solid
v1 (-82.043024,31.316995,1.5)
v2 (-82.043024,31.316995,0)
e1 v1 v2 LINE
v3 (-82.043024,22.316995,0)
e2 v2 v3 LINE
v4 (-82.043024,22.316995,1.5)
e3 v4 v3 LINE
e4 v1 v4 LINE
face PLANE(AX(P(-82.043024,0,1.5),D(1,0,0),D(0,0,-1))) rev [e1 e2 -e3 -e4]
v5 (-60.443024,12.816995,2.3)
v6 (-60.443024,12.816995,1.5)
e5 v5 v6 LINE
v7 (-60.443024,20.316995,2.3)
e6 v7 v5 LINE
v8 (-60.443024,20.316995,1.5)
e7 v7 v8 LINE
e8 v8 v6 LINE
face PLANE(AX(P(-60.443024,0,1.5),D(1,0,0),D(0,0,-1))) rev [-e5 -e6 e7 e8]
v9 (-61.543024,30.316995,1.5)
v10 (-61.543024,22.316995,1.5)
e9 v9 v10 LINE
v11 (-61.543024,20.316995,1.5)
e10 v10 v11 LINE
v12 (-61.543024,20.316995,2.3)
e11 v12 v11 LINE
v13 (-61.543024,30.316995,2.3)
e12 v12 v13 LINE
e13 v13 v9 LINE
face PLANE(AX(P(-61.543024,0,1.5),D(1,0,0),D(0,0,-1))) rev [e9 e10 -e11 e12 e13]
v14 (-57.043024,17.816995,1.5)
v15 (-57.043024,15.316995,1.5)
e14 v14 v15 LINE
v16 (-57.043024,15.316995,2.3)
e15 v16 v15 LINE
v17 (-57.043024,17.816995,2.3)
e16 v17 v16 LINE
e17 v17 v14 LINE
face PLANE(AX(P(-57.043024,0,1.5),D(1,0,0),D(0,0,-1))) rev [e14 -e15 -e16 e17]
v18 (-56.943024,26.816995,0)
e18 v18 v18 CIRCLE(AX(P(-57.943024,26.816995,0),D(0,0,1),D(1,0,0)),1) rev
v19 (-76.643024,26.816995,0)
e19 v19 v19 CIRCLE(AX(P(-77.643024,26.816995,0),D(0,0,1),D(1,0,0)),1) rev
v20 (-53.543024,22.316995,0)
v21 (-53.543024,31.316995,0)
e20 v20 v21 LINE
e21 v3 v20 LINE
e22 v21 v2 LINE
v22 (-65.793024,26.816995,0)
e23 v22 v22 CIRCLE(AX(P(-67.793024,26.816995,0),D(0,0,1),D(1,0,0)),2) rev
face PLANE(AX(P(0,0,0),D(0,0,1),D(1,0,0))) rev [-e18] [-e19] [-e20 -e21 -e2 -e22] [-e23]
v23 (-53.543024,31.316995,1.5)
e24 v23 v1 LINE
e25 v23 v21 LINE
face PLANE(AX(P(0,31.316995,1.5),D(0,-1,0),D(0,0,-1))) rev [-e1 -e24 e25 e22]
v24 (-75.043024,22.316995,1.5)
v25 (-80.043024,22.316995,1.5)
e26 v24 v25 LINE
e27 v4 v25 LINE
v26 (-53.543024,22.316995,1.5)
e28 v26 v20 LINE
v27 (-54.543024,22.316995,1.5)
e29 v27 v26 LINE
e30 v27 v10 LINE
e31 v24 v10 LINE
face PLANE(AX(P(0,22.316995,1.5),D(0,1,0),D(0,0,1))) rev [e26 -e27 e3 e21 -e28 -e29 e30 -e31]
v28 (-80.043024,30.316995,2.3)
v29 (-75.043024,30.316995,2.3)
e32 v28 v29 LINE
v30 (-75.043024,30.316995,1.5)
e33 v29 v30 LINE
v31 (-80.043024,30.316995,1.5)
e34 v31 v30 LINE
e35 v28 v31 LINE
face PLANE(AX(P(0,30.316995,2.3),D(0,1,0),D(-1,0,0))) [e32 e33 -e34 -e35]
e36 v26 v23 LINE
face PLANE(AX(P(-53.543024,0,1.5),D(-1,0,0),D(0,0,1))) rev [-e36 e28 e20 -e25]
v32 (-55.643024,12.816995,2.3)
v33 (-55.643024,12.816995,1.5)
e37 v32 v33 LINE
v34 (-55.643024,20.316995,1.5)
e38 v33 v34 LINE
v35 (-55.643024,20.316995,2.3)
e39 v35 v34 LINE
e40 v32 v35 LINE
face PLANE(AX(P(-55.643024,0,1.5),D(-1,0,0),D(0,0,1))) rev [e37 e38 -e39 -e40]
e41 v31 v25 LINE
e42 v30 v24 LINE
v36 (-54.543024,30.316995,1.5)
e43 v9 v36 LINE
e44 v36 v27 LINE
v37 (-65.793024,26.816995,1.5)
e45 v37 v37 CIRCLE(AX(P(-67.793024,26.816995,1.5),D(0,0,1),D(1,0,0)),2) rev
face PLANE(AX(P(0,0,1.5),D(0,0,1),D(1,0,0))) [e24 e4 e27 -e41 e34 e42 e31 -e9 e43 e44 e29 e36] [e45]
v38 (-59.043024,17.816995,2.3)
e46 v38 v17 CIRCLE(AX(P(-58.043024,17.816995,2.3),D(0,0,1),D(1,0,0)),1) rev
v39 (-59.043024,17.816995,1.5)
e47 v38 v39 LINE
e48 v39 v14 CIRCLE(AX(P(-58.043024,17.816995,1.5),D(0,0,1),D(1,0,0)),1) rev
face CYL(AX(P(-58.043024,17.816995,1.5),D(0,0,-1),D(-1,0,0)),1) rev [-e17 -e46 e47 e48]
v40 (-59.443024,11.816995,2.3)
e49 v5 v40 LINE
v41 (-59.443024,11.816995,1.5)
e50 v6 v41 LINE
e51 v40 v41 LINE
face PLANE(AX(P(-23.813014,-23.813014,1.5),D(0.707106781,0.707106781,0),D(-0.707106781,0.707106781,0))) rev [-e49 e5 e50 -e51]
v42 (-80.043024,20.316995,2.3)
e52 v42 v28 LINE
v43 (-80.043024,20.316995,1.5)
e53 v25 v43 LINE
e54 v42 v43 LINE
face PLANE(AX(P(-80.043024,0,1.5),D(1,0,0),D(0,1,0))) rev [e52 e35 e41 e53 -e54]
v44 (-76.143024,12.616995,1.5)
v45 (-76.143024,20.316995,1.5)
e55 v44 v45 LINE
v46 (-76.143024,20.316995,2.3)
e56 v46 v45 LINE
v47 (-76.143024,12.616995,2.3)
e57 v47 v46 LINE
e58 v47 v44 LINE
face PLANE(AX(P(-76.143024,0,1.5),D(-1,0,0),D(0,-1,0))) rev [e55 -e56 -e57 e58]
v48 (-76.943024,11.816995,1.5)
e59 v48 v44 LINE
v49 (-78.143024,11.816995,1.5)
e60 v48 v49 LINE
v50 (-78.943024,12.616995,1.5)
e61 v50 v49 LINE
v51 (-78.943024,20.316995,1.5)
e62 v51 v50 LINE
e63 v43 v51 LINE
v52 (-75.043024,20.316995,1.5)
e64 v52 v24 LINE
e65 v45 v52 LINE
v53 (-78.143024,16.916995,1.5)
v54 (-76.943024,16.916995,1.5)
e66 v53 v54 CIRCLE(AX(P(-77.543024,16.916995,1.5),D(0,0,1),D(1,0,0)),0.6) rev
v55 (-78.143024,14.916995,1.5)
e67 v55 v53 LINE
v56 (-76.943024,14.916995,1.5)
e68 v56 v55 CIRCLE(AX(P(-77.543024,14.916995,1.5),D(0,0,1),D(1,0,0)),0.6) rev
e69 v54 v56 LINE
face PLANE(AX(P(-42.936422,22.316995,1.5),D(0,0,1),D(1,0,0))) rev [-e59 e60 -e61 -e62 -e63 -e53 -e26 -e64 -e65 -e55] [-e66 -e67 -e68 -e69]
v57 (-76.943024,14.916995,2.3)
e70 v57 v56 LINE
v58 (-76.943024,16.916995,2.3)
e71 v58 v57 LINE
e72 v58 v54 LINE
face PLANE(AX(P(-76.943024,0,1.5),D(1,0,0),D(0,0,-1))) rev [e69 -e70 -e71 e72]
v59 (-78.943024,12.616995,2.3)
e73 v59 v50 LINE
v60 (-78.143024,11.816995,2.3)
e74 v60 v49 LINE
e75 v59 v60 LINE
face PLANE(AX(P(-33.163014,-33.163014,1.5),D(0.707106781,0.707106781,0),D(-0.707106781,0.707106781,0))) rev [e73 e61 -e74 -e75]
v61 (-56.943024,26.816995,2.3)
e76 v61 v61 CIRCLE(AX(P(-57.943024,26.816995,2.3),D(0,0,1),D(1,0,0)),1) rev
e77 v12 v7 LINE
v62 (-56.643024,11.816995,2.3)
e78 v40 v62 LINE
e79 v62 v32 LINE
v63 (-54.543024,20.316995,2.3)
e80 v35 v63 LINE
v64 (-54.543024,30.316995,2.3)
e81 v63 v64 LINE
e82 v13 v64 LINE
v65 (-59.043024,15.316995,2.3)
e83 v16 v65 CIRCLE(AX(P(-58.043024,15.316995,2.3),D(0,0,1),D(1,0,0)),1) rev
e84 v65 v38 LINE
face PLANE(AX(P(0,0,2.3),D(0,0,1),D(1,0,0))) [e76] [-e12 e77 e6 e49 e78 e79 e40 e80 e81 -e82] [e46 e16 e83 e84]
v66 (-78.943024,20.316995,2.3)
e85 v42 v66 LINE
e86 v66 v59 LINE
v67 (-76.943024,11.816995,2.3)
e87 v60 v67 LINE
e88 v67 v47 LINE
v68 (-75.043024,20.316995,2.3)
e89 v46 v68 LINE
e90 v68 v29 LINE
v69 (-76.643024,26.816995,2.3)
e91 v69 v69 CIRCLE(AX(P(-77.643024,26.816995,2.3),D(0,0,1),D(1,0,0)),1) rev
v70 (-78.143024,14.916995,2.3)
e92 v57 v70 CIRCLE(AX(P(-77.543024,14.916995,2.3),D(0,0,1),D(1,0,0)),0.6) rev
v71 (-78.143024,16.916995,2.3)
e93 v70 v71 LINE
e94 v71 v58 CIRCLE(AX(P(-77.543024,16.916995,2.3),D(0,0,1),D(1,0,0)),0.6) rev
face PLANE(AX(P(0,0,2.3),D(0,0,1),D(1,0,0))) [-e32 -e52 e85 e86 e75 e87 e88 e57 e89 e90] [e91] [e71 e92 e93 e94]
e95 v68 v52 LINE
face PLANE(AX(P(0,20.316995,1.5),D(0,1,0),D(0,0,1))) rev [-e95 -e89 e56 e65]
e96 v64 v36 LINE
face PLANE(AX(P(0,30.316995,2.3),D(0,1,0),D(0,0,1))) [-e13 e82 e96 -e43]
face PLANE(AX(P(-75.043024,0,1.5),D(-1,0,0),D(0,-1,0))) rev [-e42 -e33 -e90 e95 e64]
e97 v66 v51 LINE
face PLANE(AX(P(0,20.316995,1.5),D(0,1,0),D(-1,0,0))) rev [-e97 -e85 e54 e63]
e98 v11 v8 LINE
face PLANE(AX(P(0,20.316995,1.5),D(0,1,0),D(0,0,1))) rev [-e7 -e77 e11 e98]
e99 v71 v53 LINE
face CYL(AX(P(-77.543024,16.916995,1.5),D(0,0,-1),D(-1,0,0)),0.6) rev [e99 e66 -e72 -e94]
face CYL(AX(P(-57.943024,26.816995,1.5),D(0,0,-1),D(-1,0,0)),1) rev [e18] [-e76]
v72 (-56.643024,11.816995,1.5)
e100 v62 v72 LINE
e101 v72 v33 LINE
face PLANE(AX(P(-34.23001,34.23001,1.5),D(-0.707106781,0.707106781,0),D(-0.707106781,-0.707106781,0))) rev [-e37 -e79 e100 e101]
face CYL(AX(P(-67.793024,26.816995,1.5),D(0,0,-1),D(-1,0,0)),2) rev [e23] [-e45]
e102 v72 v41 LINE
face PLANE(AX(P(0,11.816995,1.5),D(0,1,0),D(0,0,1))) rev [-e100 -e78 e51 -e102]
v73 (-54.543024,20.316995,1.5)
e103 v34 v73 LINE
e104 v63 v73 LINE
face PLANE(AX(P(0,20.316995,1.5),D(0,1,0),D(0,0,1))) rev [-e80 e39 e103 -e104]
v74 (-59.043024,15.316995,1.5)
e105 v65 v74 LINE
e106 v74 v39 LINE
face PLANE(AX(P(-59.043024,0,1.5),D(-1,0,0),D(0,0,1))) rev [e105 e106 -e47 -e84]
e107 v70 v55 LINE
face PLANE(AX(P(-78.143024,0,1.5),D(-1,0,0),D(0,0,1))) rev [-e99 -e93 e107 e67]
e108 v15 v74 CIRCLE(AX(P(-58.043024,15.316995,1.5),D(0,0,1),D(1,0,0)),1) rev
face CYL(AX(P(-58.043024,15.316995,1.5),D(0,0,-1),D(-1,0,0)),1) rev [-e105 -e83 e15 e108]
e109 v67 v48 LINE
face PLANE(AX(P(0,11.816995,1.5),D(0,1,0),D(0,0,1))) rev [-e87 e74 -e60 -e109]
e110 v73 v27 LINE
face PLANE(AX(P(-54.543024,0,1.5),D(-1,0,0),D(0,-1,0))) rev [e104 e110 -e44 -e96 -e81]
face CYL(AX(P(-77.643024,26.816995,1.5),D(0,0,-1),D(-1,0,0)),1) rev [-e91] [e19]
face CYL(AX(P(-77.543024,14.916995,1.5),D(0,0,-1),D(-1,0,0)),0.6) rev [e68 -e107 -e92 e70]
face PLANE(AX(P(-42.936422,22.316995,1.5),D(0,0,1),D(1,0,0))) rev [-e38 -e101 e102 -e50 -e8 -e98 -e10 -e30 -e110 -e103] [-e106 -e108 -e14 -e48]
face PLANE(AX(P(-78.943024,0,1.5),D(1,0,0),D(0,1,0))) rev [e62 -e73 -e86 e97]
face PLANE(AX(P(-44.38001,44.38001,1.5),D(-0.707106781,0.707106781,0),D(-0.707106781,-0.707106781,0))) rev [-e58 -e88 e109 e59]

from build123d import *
from build123d.topology import SkipClean

# Parameters (mm, degrees)
ESQUISSE1_W             = 7
ESQUISSE1_H             = 8
ESQUISSE1_W_2           = 5
BOSS_EXTRU_1_DEPTH      = 1.5
ESQUISSE2_R             = 1
BOSS_EXTRU_2_DEPTH      = 0.8
ESQUISSE3_W             = 1.5
ESQUISSE3_H             = 10.5
ENL_V_MAT_EXTRU_1_DEPTH = 28.5


with BuildPart() as part:
    # Esquisse1 → Boss.-Extru.1 (new body)
    # profile 1 of 5: a face of its own
    with BuildSketch(Plane.XY):
        Polygon((-54.543024121, 30.316995205), (-54.543024121, 22.316995205), (-53.543024121, 22.316995205), (-53.543024121, 31.316995205), (-82.043024121, 31.316995205), (-82.043024121, 22.316995205), (-80.043024121, 22.316995205), (-80.043024121, 30.316995205), (-75.043024121, 30.316995205), (-75.043024121, 22.316995205), (-61.543024121, 22.316995205), (-61.543024121, 30.316995205), align=None)
        with BuildLine():
            ThreePointArc((-69.793024121, 26.816995205), (-67.793024121, 28.816995205), (-65.793024121, 26.816995205))
            ThreePointArc((-65.793024121, 26.816995205), (-67.793024121, 24.816995205), (-69.793024121, 26.816995205))
        make_face(mode=Mode.SUBTRACT)
    # profile 2 of 5: a face of its own
    with BuildSketch(Plane.XY):
        Polygon((-55.643024121, 20.316995205), (-54.543024121, 20.316995205), (-54.543024121, 22.316995205), (-61.543024121, 22.316995205), (-61.543024121, 20.316995205), (-60.443024121, 20.316995205), (-60.443024121, 12.816995205), (-59.443024121, 11.816995205), (-56.643024121, 11.816995205), (-55.643024121, 12.816995205), align=None)
        with BuildLine():
            ThreePointArc((-59.043024121, 17.816995205), (-58.043024121, 18.816995205), (-57.043024121, 17.816995205))
            Line((-57.043024121, 17.816995205), (-57.043024121, 15.316995205))
            ThreePointArc((-57.043024121, 15.316995205), (-58.043024121, 14.316995205), (-59.043024121, 15.316995205))
            Line((-59.043024121, 15.316995205), (-59.043024121, 17.816995205))
        make_face(mode=Mode.SUBTRACT)
    # profile 3 of 5: a face of its own
    with BuildSketch(Plane.XY):
        Polygon((-75.043024121, 20.316995205), (-75.043024121, 22.316995205), (-80.043024121, 22.316995205), (-80.043024121, 20.316995205), (-78.943024121, 20.316995205), (-78.943024121, 12.616995205), (-78.143024121, 11.816995205), (-76.943024121, 11.816995205), (-76.143024121, 12.616995205), (-76.143024121, 20.316995205), align=None)
        with BuildLine():
            ThreePointArc((-78.143024121, 16.916995205), (-77.543024121, 17.516995205), (-76.943024121, 16.916995205))
            Line((-76.943024121, 16.916995205), (-76.943024121, 14.916995205))
            ThreePointArc((-76.943024121, 14.916995205), (-77.543024121, 14.316995205), (-78.143024121, 14.916995205))
            Line((-78.143024121, 14.916995205), (-78.143024121, 16.916995205))
        make_face(mode=Mode.SUBTRACT)
    # profile 4 of 5: a face of its own
    with BuildSketch(Plane.XY):
        with Locations((-58.043024121, 26.316995205)):
            Rectangle(ESQUISSE1_W, ESQUISSE1_H)
        with BuildLine():
            ThreePointArc((-58.943024121, 26.816995205), (-57.943024121, 27.816995205), (-56.943024121, 26.816995205))
            ThreePointArc((-56.943024121, 26.816995205), (-57.943024121, 25.816995205), (-58.943024121, 26.816995205))
        make_face(mode=Mode.SUBTRACT)
    # profile 5 of 5: a face of its own
    with BuildSketch(Plane.XY):
        with Locations((-77.543024121, 26.316995205)):
            Rectangle(ESQUISSE1_W_2, ESQUISSE1_H)
        with BuildLine():
            ThreePointArc((-76.643024121, 26.816995205), (-77.643024121, 25.816995205), (-78.643024121, 26.816995205))
            ThreePointArc((-78.643024121, 26.816995205), (-77.643024121, 27.816995205), (-76.643024121, 26.816995205))
        make_face(mode=Mode.SUBTRACT)
    extrude(amount=BOSS_EXTRU_1_DEPTH)

    # Esquisse2 → Boss.-Extru.2 (add)
    # profile 1 of 2: a face of its own
    with SkipClean():  # the faces are left unmerged after this step: merging them gives an invalid solid
        with BuildSketch(Plane.XY.offset(1.5)):
            Polygon((-80.043024121, 22.316995205), (-80.043024121, 20.316995205), (-78.943024121, 20.316995205), (-78.943024121, 12.616995205), (-78.143024121, 11.816995205), (-76.943024121, 11.816995205), (-76.143024121, 12.616995205), (-76.143024121, 20.316995205), (-75.043024121, 20.316995205), (-75.043024121, 22.316995205), (-75.043024121, 30.316995205), (-80.043024121, 30.316995205), align=None)
            with BuildLine():
                ThreePointArc((-78.143024121, 16.916995205), (-77.543024121, 17.516995205), (-76.943024121, 16.916995205))
                Line((-76.943024121, 16.916995205), (-76.943024121, 14.916995205))
                ThreePointArc((-76.943024121, 14.916995205), (-77.543024121, 14.316995205), (-78.143024121, 14.916995205))
                Line((-78.143024121, 14.916995205), (-78.143024121, 16.916995205))
            make_face(mode=Mode.SUBTRACT)
            with Locations((-77.643024121, 26.816995205)):
                Circle(ESQUISSE2_R, mode=Mode.SUBTRACT)
        # profile 2 of 2: a face of its own
        with BuildSketch(Plane.XY.offset(1.5)):
            Polygon((-61.543024121, 22.316995205), (-61.543024121, 20.316995205), (-60.443024121, 20.316995205), (-60.443024121, 12.816995205), (-59.443024121, 11.816995205), (-56.643024121, 11.816995205), (-55.643024121, 12.816995205), (-55.643024121, 20.316995205), (-54.543024121, 20.316995205), (-54.543024121, 22.316995205), (-54.543024121, 30.316995205), (-61.543024121, 30.316995205), align=None)
            with BuildLine():
                ThreePointArc((-59.043024121, 17.816995205), (-58.043024121, 18.816995205), (-57.043024121, 17.816995205))
                Line((-57.043024121, 17.816995205), (-57.043024121, 15.316995205))
                ThreePointArc((-57.043024121, 15.316995205), (-58.043024121, 14.316995205), (-59.043024121, 15.316995205))
                Line((-59.043024121, 15.316995205), (-59.043024121, 17.816995205))
            make_face(mode=Mode.SUBTRACT)
            with Locations((-57.943024121, 26.816995205)):
                Circle(ESQUISSE2_R, mode=Mode.SUBTRACT)
        extrude(amount=BOSS_EXTRU_2_DEPTH)

    # Esquisse3 → Enlèv. mat.-Extru.1 (cut)
    with SkipClean():  # the faces are left unmerged after this step: merging them gives an invalid solid
        with BuildSketch(Plane.ZY.offset(82.043024121)):
            with Locations((0.75, 17.066995205)):
                Rectangle(ESQUISSE3_W, ESQUISSE3_H)
        extrude(amount=-ENL_V_MAT_EXTRU_1_DEPTH, mode=Mode.SUBTRACT)
    add(part.part.scale(1), mode=Mode.REPLACE)  # the faces are merged on a copy


solid = part.part
